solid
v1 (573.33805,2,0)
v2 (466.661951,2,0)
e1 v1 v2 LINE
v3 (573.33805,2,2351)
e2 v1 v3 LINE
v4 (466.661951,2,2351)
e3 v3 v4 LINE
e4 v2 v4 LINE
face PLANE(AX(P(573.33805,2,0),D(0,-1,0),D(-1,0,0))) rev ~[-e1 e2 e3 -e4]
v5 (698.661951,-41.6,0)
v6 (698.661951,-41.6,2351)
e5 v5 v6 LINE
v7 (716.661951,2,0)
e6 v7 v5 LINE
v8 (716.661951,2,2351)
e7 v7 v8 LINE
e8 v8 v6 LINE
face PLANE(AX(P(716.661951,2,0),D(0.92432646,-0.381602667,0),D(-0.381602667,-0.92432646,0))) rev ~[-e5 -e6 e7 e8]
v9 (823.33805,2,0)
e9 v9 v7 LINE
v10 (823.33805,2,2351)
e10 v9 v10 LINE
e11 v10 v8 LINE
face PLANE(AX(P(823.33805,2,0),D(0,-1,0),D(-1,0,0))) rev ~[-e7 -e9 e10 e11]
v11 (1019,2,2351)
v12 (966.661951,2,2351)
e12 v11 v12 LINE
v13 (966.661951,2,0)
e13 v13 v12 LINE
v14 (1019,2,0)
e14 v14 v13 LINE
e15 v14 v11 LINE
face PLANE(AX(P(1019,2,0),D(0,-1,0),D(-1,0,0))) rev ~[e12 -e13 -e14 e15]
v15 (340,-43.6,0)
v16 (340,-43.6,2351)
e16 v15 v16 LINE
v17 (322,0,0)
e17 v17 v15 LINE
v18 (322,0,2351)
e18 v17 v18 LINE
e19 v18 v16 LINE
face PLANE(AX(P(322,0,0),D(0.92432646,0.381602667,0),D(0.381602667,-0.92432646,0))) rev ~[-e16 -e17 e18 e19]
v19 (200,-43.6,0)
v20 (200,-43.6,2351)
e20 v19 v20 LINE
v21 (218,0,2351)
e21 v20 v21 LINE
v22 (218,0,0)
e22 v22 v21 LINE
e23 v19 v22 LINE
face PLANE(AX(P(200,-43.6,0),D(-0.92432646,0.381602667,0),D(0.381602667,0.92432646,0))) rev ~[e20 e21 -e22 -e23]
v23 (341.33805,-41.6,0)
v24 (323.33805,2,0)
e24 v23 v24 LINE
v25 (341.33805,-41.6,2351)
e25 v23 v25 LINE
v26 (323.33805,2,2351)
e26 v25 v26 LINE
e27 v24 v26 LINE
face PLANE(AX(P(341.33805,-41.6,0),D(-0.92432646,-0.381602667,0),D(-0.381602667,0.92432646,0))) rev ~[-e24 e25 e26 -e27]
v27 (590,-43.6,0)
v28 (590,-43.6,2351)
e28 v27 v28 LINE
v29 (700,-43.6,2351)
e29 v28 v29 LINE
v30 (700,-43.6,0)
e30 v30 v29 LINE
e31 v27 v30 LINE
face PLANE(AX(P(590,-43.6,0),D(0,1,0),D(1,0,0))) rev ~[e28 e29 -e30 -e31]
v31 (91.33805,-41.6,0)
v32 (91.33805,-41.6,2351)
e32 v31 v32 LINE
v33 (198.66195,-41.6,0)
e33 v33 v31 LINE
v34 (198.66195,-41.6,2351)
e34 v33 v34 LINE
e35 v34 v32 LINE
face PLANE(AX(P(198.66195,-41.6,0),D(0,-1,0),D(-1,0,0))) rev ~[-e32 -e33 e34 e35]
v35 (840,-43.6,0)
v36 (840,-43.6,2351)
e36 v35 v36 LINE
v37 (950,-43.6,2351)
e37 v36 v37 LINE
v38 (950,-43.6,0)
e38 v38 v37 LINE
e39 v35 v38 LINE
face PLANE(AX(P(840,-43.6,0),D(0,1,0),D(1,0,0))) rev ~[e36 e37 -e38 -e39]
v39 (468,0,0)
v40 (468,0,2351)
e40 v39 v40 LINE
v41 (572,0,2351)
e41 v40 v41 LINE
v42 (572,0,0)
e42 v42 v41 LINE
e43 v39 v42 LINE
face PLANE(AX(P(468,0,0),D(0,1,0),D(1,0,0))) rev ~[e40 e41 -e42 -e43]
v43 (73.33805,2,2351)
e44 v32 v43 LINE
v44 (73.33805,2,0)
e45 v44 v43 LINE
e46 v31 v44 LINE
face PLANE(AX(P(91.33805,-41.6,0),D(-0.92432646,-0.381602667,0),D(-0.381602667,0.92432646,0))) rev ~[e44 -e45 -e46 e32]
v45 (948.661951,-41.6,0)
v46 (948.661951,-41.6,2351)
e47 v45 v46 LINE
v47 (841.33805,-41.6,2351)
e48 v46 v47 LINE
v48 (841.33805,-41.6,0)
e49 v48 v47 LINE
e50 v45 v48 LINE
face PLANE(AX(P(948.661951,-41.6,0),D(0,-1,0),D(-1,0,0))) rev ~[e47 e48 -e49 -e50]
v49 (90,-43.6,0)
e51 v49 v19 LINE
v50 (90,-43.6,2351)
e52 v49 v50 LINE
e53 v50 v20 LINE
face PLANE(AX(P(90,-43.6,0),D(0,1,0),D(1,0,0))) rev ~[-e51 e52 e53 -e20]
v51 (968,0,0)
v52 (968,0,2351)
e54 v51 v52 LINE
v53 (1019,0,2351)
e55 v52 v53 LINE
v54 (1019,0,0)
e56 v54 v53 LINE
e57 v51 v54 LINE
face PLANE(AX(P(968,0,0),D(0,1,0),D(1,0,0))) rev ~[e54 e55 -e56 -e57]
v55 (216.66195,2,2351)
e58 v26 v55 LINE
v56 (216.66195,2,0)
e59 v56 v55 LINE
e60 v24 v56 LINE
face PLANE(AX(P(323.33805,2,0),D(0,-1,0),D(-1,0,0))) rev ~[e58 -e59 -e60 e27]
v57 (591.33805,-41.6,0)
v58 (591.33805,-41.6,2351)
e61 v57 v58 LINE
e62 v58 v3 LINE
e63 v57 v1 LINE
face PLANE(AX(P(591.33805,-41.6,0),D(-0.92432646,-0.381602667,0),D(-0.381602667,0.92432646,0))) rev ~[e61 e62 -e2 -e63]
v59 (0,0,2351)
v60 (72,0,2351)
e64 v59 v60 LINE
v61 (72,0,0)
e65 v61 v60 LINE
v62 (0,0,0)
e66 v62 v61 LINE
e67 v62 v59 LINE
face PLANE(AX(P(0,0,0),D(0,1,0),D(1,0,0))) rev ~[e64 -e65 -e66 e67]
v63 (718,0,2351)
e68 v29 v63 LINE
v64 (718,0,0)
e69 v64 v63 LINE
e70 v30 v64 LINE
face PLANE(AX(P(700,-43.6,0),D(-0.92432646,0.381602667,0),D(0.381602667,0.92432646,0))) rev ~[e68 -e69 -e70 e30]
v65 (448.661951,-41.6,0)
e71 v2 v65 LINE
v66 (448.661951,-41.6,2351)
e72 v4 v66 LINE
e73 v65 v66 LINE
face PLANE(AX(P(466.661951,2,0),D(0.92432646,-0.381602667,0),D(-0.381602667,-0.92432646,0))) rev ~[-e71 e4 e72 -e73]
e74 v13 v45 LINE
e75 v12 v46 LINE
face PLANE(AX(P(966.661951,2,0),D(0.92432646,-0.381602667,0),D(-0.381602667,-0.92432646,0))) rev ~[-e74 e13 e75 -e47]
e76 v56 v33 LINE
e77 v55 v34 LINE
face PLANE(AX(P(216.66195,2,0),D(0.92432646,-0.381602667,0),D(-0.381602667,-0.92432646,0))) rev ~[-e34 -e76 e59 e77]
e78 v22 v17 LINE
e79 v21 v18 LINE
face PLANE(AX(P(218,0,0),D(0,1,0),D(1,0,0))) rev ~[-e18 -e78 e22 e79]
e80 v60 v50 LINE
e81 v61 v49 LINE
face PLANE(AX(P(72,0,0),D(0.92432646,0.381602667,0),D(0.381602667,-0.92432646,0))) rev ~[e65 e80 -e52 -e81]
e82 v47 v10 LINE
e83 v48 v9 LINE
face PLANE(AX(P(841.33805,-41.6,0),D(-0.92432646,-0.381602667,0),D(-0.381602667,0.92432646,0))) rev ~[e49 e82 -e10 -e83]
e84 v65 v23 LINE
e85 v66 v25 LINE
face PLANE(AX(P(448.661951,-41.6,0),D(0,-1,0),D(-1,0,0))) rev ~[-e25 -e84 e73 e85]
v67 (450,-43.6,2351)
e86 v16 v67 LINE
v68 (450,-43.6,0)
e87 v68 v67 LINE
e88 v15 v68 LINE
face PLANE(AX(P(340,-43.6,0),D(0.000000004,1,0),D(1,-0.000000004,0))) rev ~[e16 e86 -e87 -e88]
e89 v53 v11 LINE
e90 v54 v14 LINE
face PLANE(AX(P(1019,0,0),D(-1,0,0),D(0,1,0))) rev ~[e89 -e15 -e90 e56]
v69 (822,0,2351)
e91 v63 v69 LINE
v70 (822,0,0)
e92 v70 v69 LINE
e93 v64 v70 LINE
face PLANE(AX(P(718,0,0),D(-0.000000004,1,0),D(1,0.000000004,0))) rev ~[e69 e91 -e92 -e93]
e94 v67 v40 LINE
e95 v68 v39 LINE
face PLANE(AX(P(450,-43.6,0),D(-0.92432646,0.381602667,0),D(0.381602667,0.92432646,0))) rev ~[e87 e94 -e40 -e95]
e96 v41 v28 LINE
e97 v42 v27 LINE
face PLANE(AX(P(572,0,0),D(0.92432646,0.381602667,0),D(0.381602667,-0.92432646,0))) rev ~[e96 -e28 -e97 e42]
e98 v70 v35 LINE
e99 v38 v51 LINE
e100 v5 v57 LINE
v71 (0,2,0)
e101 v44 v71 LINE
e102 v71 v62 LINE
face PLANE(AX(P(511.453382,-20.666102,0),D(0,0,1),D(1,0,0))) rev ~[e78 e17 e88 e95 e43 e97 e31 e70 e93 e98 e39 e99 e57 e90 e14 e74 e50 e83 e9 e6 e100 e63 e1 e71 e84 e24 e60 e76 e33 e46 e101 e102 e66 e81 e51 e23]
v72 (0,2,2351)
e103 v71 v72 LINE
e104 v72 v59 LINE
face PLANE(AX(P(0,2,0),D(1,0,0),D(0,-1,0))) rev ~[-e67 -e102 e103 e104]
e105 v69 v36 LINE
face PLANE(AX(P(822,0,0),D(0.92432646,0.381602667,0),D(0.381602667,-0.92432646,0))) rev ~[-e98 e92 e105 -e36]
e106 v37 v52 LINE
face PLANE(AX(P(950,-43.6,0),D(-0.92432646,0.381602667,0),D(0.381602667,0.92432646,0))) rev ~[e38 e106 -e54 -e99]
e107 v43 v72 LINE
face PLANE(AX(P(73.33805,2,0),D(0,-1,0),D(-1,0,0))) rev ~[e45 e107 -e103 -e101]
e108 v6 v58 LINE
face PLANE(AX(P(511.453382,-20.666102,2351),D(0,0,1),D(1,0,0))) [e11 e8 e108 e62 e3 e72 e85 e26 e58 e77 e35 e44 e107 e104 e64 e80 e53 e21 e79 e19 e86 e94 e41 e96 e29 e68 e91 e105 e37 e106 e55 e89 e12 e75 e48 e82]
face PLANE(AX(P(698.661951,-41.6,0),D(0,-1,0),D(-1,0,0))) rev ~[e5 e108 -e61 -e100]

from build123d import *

# Parameters (mm, degrees)
F1_DEPTH = 2351


# Not quite as in the source:
# - ends of sketch curves that miss each other by under 0.0002 mm in the source are joined


with BuildPart() as f1:
    # F0 (on Top) → F1 (new body)
    with BuildSketch(Plane.XY):
        Polygon((0, 2), (0, 0), (72, 0), (90, -43.6), (200, -43.6), (218, 1.3e-09), (322, 1.3e-09), (340.0000000005, -43.5999999998), (450.0000001826, -43.6000004409), (468.0000001826, -4.409e-07), (572.0000001826, -4.409e-07), (590.0000001826, -43.6000004409), (700.0000001827, -43.6000004411), (718.0000001827, -4.408e-07), (822.0000003647, 0), (840.0000003647, -43.6), (950.0000003647, -43.6000000002), (968.0000003647, 0), (1019, 0), (1019, 2), (966.6619507468, 2.0000000002), (948.6619507468, -41.6), (841.3380499816, -41.6), (823.3380499816, 2), (716.6619507468, 2), (698.6619505647, -41.6000004409), (591.3380497995, -41.6000004409), (573.3380497995, 1.9999995591), (466.6619505647, 1.9999995591), (448.6619505647, -41.6000004409), (341.3380497995, -41.6000004409), (323.3380496174, 2.0000000002), (216.6619503826, 2.0000000002), (198.6619503831, -41.6), (91.3380496174, -41.6), (73.3380496174, 2), align=None)
    extrude(amount=F1_DEPTH)


solid = f1.part
